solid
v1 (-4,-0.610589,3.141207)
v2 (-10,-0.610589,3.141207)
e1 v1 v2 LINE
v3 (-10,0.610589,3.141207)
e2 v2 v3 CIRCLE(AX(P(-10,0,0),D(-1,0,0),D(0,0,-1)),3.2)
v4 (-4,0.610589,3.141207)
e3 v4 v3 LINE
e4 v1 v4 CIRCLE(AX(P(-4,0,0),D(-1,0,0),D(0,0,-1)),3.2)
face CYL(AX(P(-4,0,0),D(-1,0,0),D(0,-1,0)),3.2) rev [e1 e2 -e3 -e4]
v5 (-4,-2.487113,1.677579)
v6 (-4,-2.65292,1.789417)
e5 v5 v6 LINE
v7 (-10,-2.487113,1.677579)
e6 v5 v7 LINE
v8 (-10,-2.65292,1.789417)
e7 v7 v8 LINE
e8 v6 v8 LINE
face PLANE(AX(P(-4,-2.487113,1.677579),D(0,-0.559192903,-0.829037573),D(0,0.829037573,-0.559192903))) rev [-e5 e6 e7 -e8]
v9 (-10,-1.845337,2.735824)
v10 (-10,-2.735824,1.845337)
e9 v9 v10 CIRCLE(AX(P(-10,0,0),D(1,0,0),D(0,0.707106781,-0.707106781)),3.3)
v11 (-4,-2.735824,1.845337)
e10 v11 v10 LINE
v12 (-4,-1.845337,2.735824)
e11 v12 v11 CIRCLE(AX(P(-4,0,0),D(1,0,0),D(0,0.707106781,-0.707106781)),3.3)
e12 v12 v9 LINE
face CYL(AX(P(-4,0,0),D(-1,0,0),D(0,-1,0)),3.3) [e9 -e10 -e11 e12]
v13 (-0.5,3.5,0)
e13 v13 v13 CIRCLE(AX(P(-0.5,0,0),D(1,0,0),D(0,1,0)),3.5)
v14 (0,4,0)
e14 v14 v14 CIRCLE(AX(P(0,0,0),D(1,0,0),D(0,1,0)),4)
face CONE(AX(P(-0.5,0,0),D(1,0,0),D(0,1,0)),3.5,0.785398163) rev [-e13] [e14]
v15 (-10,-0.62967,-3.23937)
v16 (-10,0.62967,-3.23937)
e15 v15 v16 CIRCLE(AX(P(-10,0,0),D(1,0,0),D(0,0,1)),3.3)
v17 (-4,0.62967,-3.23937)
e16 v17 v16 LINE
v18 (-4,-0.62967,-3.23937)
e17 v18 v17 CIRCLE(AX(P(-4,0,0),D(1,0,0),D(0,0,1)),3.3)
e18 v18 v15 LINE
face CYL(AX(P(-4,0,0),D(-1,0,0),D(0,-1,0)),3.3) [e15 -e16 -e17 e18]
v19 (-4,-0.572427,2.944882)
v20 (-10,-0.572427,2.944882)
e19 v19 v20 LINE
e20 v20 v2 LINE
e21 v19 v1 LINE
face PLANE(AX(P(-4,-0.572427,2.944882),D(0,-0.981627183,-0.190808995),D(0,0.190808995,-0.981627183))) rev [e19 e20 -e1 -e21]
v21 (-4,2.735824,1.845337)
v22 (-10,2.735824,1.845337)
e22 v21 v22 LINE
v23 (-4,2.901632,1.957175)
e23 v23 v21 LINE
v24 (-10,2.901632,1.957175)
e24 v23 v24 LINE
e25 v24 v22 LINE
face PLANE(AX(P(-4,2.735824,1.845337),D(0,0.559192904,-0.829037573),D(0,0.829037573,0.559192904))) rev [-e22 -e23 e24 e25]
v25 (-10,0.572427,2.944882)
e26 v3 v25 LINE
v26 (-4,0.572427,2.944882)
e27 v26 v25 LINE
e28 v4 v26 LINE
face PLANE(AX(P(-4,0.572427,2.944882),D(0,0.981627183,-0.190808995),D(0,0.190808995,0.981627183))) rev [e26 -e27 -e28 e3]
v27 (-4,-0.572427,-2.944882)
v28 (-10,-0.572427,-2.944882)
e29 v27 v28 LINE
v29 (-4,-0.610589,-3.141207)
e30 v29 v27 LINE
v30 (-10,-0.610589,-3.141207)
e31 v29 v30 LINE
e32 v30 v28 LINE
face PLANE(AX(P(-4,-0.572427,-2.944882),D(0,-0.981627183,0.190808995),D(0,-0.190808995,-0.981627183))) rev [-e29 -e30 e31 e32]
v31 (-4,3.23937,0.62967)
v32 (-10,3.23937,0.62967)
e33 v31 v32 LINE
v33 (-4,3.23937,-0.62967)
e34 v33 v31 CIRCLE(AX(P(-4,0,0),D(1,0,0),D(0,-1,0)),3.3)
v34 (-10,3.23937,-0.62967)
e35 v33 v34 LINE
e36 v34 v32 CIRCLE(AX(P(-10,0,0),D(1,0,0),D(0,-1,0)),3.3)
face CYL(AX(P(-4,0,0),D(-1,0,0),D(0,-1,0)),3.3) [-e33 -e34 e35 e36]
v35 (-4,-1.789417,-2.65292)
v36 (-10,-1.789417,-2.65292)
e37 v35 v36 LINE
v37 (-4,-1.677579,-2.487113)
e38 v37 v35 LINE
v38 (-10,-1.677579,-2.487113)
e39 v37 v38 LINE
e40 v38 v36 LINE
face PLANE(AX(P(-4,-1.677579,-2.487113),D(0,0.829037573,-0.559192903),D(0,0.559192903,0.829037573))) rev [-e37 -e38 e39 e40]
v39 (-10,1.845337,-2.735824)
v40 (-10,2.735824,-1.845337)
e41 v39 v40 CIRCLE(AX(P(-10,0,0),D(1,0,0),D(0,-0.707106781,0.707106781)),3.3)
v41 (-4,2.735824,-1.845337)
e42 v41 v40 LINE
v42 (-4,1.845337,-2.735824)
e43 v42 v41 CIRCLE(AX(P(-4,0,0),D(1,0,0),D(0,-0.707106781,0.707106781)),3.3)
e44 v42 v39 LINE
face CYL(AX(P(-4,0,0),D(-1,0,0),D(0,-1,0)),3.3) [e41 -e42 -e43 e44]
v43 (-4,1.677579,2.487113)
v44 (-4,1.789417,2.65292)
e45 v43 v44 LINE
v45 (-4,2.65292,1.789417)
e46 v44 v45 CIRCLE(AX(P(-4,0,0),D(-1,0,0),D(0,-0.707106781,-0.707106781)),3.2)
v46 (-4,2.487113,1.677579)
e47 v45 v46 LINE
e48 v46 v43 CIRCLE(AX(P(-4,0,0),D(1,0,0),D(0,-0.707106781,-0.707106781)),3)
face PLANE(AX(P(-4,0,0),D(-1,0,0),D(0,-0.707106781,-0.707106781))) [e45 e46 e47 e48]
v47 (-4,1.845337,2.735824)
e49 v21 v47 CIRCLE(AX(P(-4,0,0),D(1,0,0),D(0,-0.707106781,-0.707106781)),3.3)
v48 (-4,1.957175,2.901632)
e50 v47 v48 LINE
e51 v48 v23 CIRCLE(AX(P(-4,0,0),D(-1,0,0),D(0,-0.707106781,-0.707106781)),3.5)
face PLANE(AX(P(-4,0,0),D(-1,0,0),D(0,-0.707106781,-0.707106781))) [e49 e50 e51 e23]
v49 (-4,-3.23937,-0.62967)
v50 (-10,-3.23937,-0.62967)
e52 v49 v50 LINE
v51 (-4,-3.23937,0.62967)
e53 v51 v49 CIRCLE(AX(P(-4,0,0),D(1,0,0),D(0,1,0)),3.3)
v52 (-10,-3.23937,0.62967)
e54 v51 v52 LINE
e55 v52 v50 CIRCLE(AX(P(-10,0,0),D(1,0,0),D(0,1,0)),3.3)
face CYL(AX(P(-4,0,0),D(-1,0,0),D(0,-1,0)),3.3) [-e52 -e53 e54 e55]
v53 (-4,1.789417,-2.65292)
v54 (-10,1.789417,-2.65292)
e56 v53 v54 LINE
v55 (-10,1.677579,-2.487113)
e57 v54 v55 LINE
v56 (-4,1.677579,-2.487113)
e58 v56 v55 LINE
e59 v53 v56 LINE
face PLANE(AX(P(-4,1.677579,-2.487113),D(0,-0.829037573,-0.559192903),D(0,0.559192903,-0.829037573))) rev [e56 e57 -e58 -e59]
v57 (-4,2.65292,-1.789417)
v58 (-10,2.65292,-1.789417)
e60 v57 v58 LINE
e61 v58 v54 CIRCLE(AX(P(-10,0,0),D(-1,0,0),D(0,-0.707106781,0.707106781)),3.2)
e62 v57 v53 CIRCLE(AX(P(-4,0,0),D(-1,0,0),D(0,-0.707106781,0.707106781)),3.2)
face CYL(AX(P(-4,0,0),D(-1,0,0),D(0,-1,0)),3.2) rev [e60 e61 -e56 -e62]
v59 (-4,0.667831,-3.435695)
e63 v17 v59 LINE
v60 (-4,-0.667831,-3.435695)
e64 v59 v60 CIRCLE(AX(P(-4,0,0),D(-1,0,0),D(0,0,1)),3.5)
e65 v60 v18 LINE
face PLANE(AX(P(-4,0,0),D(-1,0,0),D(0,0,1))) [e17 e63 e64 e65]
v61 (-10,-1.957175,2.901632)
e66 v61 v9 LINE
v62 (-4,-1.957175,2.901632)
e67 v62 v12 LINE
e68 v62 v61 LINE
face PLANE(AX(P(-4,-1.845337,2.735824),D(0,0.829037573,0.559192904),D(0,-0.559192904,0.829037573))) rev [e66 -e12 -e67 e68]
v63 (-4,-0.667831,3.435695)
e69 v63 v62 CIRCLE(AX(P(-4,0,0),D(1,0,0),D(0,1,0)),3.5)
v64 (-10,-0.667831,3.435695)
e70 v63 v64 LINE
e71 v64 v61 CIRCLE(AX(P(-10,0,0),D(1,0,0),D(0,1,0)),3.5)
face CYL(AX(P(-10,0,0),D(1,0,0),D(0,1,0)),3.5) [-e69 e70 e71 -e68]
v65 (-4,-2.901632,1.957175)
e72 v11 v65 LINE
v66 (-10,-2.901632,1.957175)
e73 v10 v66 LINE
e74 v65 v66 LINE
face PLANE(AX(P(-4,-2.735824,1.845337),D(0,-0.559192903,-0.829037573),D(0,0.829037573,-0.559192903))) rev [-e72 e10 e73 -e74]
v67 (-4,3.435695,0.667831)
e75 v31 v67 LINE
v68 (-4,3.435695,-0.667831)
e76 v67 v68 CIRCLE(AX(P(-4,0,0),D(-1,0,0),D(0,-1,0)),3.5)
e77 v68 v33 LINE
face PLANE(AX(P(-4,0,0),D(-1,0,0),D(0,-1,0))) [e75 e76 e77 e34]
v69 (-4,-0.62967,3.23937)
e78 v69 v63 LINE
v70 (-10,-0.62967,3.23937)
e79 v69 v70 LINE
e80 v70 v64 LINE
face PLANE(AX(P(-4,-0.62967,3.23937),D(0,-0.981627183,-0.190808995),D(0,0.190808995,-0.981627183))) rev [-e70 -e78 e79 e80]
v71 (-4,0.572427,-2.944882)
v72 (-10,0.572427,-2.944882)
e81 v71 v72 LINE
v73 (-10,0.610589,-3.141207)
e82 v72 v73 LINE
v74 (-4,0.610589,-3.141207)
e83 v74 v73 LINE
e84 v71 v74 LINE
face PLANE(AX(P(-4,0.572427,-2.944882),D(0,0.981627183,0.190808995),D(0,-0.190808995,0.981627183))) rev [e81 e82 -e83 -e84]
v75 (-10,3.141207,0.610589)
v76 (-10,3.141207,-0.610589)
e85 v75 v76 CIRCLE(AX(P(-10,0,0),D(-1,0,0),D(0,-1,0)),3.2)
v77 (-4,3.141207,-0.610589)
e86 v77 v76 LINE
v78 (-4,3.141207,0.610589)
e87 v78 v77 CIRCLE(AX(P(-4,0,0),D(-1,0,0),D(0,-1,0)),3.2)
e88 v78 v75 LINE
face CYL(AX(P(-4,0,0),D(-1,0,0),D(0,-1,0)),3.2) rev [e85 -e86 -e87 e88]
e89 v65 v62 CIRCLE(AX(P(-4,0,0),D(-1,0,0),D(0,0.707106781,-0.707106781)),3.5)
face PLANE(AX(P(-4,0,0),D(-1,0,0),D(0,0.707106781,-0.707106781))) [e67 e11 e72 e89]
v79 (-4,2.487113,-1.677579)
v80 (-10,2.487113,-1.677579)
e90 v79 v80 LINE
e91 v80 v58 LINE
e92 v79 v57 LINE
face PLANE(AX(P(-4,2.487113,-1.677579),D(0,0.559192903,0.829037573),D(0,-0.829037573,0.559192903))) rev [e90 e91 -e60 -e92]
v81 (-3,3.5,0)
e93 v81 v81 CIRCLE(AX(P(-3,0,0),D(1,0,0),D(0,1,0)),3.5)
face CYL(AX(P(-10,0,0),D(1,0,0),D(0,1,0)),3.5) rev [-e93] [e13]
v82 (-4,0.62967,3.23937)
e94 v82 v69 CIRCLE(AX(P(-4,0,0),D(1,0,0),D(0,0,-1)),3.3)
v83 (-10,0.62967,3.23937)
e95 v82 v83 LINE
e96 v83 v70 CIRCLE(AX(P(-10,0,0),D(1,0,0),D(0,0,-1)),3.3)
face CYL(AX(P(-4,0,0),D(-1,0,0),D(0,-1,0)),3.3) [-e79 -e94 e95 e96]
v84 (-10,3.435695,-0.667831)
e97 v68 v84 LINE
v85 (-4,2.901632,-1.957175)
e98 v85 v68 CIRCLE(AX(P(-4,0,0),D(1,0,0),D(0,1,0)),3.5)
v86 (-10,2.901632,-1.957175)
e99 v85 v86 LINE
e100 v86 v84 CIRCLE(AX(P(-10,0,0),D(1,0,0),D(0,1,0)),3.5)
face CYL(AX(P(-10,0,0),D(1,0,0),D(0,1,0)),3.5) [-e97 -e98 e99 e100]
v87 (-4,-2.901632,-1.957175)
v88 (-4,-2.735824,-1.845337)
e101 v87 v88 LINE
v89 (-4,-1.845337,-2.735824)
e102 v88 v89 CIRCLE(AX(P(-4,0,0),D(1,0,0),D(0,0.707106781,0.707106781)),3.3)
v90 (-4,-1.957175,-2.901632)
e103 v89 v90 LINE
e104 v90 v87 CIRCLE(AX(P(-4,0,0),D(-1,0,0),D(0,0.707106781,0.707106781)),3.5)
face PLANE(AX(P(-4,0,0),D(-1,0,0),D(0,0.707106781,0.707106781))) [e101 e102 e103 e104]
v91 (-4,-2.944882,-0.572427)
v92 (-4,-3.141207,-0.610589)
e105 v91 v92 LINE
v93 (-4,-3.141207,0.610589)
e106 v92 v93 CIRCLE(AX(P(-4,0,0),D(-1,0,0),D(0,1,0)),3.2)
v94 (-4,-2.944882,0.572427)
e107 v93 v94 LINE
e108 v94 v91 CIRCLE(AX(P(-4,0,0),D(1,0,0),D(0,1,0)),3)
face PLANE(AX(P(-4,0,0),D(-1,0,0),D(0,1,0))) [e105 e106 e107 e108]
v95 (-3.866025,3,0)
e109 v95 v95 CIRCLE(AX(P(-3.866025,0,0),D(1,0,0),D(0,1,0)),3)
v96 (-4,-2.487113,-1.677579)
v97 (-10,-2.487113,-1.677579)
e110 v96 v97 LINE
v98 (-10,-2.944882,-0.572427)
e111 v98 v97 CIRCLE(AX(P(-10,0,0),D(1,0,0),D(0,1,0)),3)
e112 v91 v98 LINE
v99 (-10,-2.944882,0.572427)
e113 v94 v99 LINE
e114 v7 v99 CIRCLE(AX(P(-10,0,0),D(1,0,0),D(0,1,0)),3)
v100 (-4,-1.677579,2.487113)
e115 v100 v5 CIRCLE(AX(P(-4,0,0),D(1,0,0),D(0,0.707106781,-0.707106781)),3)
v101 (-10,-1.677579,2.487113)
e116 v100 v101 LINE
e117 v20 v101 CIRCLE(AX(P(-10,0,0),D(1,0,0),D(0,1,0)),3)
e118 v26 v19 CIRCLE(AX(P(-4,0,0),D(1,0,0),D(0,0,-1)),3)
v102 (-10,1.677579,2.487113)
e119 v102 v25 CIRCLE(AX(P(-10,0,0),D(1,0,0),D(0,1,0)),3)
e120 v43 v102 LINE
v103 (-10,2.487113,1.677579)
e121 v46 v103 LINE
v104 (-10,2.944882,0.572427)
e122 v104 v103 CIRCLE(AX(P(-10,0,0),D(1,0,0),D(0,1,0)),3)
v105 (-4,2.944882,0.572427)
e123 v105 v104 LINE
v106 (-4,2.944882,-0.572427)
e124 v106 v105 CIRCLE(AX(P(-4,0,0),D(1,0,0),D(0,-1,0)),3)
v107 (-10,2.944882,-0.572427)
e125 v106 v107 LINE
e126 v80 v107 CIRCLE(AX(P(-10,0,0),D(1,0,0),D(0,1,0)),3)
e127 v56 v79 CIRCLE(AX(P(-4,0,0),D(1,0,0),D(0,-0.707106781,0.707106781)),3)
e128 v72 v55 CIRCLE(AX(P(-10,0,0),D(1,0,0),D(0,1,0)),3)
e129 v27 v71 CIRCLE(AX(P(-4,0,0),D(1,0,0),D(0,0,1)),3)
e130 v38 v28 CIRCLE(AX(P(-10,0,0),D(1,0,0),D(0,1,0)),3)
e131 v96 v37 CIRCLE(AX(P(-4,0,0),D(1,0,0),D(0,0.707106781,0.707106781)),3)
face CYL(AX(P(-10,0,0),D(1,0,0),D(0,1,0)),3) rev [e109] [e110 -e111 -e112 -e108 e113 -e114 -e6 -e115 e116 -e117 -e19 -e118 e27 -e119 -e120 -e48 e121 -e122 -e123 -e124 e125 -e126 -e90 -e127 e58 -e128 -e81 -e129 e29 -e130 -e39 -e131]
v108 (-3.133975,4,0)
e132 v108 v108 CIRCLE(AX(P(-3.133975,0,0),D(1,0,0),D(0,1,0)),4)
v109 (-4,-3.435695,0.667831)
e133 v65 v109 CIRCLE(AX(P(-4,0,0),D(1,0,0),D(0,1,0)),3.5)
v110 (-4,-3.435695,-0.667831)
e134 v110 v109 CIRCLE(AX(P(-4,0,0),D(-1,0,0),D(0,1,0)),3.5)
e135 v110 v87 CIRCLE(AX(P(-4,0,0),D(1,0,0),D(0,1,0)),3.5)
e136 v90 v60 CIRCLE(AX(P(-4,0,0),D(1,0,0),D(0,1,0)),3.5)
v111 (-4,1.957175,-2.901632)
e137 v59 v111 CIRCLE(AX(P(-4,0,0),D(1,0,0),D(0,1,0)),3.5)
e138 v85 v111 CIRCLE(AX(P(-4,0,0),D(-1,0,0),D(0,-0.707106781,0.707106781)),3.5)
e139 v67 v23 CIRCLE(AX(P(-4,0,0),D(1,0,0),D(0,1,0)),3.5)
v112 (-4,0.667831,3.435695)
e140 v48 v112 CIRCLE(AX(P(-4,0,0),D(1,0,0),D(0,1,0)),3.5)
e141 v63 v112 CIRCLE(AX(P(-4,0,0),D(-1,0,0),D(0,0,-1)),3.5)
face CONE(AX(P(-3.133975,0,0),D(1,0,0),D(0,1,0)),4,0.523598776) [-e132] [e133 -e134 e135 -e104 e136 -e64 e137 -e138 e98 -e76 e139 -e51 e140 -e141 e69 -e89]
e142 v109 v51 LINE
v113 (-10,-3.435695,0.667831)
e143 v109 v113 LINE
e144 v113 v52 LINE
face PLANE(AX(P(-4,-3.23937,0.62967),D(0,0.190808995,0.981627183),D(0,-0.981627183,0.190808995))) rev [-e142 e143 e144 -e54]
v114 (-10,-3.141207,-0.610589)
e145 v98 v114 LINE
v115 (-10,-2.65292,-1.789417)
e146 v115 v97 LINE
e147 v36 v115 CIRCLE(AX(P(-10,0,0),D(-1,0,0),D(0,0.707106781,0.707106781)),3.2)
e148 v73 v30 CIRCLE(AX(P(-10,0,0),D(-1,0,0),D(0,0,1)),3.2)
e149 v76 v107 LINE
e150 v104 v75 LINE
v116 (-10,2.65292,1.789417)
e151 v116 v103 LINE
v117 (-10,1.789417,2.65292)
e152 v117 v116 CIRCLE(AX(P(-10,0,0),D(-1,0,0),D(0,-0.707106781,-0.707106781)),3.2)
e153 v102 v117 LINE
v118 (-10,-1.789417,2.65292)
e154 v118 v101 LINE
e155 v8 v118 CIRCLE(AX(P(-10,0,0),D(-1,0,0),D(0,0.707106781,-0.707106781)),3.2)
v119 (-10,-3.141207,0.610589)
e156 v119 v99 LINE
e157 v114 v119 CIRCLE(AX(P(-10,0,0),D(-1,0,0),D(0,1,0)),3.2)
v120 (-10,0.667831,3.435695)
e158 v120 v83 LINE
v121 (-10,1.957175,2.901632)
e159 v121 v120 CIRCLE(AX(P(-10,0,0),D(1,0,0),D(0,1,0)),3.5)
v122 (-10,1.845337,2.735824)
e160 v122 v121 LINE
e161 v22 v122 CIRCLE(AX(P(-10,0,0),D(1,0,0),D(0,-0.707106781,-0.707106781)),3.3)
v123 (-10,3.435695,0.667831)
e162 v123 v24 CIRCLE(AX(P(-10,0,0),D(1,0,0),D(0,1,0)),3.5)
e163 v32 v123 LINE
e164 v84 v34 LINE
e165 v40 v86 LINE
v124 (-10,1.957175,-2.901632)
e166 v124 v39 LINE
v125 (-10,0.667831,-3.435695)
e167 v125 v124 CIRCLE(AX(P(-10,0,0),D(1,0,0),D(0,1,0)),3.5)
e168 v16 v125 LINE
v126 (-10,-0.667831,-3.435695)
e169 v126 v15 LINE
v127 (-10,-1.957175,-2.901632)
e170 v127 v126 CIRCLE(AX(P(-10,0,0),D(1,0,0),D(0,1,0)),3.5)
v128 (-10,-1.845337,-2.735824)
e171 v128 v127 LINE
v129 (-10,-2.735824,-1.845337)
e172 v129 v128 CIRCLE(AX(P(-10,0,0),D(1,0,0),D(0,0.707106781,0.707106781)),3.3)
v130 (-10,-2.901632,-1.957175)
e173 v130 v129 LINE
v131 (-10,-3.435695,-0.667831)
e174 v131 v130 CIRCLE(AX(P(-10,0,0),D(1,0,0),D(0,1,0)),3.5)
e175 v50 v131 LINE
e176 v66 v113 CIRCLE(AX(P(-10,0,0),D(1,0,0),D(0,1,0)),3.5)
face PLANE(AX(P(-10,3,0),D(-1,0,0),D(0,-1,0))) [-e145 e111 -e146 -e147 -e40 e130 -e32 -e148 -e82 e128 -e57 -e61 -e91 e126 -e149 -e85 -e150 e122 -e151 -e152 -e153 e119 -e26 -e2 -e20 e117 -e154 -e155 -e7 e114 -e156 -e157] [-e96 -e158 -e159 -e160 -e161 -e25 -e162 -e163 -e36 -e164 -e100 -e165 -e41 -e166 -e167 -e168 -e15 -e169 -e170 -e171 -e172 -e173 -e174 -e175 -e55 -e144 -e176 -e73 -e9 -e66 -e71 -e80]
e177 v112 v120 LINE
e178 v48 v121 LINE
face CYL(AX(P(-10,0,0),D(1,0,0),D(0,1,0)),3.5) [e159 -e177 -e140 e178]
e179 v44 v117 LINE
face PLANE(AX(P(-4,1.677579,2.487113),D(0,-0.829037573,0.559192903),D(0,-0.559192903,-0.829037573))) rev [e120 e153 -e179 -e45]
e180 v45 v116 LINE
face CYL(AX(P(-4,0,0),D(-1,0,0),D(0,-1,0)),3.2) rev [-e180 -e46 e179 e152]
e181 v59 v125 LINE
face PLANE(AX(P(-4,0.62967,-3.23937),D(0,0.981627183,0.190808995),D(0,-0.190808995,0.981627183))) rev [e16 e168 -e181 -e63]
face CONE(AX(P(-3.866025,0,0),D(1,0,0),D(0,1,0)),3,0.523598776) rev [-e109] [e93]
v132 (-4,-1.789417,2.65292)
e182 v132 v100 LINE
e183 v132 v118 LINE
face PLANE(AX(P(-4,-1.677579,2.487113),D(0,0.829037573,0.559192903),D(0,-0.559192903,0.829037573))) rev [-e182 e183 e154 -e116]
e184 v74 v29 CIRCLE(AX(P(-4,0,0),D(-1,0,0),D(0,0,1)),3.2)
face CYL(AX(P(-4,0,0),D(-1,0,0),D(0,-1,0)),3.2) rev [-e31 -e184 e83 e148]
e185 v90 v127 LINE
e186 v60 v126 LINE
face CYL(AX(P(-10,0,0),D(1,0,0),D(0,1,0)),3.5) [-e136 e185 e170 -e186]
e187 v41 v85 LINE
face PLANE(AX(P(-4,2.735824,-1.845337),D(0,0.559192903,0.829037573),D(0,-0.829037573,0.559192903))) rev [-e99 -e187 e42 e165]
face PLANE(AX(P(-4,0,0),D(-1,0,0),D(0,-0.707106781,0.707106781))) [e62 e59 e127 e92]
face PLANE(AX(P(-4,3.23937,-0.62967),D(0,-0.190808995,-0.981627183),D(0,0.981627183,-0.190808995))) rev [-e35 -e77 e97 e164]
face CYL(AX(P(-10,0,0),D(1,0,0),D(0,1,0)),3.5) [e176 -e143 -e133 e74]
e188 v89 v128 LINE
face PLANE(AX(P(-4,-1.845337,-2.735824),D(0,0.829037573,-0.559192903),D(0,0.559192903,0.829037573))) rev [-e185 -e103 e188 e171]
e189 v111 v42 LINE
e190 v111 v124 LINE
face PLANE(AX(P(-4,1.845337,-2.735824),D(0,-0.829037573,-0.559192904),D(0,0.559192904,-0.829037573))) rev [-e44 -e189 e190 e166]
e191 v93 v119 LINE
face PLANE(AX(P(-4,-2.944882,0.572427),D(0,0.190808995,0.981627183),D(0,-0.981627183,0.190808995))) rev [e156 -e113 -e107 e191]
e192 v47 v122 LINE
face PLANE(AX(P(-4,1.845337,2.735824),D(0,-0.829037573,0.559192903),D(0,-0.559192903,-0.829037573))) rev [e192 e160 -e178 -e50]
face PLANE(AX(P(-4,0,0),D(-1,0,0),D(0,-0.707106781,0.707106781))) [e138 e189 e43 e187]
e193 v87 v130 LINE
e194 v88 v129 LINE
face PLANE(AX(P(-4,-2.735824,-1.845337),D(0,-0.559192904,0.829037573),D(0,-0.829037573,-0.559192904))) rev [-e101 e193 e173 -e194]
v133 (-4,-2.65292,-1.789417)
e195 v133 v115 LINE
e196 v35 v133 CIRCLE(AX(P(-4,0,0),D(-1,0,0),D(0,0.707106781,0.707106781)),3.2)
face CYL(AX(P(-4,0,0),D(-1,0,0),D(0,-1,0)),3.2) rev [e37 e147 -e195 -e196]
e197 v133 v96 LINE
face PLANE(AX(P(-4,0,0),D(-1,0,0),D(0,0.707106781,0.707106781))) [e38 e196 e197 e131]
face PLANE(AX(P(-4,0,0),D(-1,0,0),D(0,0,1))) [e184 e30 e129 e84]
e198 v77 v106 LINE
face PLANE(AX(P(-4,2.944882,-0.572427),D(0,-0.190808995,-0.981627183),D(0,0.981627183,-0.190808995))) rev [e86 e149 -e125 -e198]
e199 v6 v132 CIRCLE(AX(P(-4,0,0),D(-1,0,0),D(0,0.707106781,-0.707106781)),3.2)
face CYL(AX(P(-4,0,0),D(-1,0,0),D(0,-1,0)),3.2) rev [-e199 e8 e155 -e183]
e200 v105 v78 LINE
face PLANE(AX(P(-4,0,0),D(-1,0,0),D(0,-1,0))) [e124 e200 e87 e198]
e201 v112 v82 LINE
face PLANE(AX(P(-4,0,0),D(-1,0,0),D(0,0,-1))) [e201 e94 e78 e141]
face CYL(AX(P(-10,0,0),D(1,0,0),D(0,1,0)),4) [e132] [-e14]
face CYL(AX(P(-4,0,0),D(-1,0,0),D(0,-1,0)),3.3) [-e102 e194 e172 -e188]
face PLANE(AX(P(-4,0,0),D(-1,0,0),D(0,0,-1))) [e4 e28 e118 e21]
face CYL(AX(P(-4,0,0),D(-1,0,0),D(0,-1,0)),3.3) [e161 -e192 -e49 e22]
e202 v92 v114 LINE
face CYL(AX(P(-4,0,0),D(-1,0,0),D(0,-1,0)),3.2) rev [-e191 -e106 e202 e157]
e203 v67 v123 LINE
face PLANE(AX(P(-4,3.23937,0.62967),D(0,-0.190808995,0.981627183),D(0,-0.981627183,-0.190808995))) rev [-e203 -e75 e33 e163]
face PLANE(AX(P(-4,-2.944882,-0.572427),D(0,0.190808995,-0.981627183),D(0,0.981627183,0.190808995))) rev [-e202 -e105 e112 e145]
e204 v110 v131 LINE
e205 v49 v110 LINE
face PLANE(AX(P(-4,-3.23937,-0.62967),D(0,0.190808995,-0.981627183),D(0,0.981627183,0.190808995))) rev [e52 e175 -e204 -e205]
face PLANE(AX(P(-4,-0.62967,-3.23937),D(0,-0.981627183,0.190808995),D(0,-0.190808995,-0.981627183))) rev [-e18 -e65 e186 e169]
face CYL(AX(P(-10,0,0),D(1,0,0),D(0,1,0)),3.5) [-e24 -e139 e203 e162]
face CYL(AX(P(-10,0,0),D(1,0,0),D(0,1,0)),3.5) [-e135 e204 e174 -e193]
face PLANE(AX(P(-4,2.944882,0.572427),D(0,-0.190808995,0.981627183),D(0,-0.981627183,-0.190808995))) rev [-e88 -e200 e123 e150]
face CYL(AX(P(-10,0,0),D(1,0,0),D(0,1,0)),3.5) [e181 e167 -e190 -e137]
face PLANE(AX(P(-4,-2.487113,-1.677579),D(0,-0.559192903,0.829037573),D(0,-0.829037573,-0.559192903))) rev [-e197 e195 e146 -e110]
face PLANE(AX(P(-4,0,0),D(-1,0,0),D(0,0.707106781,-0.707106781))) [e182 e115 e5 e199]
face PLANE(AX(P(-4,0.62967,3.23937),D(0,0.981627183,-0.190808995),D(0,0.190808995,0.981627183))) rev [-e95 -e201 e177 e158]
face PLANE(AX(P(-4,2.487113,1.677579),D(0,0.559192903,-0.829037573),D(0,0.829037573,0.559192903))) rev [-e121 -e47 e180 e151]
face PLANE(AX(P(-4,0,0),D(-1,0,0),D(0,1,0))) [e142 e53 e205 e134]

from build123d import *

# Parameters (mm, degrees)
CUT_EXTRUDE1_DEPTH = 6
CIRPATTERN1_COUNT  = 8
CHAMFER1_SIZE      = 0.5


with BuildPart() as part:
    # Sketch2 → Revolve1 (revolve)
    with BuildSketch(Plane.XY):
        Polygon((-10, 3), (-10, 3.5), (-4, 3.5), (-3.133974596, 4), (0, 4), (0, 3.5), (-3, 3.5), (-3.866025404, 3), align=None)
    revolve(axis=Axis((-10, 0, 0), (-1, 0, 0)))

    # Sketch3 → Cut-Extrude1 (cut)
    with BuildSketch(Plane.ZY.offset(10)):
        with BuildLine():
            Line((0.572426986, 2.94488155), (0.610588785, 3.141206987))
            ThreePointArc((0.610588785, 3.141206987), (0, 3.2), (-0.610588785, 3.141206987))
            Line((-0.610588785, 3.141206987), (-0.572426986, 2.94488155))
            ThreePointArc((-0.572426986, 2.94488155), (0, 3), (0.572426986, 2.94488155))
        make_face()
        with BuildLine():
            Line((-0.629669685, 3.239369705), (-0.667831484, 3.435695142))
            ThreePointArc((-0.667831484, 3.435695142), (0, 3.5), (0.667831484, 3.435695142))
            Line((0.667831484, 3.435695142), (0.629669685, 3.239369705))
            ThreePointArc((0.629669685, 3.239369705), (0, 3.3), (-0.629669685, 3.239369705))
        make_face()
    cut_extrude1 = extrude(amount=-CUT_EXTRUDE1_DEPTH, mode=Mode.SUBTRACT)

    # CirPattern1: Cut-Extrude1 ×8 about axis
    cirpattern1_axis = Axis((0, 0, 0), (1, 0, 0))
    for i in range(1, CIRPATTERN1_COUNT):
        add(cut_extrude1.rotate(cirpattern1_axis, i * 360 / CIRPATTERN1_COUNT), mode=Mode.SUBTRACT)

    # Chamfer1
    chamfer1_edges = [part.edges().sort_by_distance(p)[0] for p in [
        (0, -3.5, 0),
    ]]
    chamfer(chamfer1_edges, length=CHAMFER1_SIZE - 0.0001)  # a hair under: the kernel refuses the full size


solid = part.part
